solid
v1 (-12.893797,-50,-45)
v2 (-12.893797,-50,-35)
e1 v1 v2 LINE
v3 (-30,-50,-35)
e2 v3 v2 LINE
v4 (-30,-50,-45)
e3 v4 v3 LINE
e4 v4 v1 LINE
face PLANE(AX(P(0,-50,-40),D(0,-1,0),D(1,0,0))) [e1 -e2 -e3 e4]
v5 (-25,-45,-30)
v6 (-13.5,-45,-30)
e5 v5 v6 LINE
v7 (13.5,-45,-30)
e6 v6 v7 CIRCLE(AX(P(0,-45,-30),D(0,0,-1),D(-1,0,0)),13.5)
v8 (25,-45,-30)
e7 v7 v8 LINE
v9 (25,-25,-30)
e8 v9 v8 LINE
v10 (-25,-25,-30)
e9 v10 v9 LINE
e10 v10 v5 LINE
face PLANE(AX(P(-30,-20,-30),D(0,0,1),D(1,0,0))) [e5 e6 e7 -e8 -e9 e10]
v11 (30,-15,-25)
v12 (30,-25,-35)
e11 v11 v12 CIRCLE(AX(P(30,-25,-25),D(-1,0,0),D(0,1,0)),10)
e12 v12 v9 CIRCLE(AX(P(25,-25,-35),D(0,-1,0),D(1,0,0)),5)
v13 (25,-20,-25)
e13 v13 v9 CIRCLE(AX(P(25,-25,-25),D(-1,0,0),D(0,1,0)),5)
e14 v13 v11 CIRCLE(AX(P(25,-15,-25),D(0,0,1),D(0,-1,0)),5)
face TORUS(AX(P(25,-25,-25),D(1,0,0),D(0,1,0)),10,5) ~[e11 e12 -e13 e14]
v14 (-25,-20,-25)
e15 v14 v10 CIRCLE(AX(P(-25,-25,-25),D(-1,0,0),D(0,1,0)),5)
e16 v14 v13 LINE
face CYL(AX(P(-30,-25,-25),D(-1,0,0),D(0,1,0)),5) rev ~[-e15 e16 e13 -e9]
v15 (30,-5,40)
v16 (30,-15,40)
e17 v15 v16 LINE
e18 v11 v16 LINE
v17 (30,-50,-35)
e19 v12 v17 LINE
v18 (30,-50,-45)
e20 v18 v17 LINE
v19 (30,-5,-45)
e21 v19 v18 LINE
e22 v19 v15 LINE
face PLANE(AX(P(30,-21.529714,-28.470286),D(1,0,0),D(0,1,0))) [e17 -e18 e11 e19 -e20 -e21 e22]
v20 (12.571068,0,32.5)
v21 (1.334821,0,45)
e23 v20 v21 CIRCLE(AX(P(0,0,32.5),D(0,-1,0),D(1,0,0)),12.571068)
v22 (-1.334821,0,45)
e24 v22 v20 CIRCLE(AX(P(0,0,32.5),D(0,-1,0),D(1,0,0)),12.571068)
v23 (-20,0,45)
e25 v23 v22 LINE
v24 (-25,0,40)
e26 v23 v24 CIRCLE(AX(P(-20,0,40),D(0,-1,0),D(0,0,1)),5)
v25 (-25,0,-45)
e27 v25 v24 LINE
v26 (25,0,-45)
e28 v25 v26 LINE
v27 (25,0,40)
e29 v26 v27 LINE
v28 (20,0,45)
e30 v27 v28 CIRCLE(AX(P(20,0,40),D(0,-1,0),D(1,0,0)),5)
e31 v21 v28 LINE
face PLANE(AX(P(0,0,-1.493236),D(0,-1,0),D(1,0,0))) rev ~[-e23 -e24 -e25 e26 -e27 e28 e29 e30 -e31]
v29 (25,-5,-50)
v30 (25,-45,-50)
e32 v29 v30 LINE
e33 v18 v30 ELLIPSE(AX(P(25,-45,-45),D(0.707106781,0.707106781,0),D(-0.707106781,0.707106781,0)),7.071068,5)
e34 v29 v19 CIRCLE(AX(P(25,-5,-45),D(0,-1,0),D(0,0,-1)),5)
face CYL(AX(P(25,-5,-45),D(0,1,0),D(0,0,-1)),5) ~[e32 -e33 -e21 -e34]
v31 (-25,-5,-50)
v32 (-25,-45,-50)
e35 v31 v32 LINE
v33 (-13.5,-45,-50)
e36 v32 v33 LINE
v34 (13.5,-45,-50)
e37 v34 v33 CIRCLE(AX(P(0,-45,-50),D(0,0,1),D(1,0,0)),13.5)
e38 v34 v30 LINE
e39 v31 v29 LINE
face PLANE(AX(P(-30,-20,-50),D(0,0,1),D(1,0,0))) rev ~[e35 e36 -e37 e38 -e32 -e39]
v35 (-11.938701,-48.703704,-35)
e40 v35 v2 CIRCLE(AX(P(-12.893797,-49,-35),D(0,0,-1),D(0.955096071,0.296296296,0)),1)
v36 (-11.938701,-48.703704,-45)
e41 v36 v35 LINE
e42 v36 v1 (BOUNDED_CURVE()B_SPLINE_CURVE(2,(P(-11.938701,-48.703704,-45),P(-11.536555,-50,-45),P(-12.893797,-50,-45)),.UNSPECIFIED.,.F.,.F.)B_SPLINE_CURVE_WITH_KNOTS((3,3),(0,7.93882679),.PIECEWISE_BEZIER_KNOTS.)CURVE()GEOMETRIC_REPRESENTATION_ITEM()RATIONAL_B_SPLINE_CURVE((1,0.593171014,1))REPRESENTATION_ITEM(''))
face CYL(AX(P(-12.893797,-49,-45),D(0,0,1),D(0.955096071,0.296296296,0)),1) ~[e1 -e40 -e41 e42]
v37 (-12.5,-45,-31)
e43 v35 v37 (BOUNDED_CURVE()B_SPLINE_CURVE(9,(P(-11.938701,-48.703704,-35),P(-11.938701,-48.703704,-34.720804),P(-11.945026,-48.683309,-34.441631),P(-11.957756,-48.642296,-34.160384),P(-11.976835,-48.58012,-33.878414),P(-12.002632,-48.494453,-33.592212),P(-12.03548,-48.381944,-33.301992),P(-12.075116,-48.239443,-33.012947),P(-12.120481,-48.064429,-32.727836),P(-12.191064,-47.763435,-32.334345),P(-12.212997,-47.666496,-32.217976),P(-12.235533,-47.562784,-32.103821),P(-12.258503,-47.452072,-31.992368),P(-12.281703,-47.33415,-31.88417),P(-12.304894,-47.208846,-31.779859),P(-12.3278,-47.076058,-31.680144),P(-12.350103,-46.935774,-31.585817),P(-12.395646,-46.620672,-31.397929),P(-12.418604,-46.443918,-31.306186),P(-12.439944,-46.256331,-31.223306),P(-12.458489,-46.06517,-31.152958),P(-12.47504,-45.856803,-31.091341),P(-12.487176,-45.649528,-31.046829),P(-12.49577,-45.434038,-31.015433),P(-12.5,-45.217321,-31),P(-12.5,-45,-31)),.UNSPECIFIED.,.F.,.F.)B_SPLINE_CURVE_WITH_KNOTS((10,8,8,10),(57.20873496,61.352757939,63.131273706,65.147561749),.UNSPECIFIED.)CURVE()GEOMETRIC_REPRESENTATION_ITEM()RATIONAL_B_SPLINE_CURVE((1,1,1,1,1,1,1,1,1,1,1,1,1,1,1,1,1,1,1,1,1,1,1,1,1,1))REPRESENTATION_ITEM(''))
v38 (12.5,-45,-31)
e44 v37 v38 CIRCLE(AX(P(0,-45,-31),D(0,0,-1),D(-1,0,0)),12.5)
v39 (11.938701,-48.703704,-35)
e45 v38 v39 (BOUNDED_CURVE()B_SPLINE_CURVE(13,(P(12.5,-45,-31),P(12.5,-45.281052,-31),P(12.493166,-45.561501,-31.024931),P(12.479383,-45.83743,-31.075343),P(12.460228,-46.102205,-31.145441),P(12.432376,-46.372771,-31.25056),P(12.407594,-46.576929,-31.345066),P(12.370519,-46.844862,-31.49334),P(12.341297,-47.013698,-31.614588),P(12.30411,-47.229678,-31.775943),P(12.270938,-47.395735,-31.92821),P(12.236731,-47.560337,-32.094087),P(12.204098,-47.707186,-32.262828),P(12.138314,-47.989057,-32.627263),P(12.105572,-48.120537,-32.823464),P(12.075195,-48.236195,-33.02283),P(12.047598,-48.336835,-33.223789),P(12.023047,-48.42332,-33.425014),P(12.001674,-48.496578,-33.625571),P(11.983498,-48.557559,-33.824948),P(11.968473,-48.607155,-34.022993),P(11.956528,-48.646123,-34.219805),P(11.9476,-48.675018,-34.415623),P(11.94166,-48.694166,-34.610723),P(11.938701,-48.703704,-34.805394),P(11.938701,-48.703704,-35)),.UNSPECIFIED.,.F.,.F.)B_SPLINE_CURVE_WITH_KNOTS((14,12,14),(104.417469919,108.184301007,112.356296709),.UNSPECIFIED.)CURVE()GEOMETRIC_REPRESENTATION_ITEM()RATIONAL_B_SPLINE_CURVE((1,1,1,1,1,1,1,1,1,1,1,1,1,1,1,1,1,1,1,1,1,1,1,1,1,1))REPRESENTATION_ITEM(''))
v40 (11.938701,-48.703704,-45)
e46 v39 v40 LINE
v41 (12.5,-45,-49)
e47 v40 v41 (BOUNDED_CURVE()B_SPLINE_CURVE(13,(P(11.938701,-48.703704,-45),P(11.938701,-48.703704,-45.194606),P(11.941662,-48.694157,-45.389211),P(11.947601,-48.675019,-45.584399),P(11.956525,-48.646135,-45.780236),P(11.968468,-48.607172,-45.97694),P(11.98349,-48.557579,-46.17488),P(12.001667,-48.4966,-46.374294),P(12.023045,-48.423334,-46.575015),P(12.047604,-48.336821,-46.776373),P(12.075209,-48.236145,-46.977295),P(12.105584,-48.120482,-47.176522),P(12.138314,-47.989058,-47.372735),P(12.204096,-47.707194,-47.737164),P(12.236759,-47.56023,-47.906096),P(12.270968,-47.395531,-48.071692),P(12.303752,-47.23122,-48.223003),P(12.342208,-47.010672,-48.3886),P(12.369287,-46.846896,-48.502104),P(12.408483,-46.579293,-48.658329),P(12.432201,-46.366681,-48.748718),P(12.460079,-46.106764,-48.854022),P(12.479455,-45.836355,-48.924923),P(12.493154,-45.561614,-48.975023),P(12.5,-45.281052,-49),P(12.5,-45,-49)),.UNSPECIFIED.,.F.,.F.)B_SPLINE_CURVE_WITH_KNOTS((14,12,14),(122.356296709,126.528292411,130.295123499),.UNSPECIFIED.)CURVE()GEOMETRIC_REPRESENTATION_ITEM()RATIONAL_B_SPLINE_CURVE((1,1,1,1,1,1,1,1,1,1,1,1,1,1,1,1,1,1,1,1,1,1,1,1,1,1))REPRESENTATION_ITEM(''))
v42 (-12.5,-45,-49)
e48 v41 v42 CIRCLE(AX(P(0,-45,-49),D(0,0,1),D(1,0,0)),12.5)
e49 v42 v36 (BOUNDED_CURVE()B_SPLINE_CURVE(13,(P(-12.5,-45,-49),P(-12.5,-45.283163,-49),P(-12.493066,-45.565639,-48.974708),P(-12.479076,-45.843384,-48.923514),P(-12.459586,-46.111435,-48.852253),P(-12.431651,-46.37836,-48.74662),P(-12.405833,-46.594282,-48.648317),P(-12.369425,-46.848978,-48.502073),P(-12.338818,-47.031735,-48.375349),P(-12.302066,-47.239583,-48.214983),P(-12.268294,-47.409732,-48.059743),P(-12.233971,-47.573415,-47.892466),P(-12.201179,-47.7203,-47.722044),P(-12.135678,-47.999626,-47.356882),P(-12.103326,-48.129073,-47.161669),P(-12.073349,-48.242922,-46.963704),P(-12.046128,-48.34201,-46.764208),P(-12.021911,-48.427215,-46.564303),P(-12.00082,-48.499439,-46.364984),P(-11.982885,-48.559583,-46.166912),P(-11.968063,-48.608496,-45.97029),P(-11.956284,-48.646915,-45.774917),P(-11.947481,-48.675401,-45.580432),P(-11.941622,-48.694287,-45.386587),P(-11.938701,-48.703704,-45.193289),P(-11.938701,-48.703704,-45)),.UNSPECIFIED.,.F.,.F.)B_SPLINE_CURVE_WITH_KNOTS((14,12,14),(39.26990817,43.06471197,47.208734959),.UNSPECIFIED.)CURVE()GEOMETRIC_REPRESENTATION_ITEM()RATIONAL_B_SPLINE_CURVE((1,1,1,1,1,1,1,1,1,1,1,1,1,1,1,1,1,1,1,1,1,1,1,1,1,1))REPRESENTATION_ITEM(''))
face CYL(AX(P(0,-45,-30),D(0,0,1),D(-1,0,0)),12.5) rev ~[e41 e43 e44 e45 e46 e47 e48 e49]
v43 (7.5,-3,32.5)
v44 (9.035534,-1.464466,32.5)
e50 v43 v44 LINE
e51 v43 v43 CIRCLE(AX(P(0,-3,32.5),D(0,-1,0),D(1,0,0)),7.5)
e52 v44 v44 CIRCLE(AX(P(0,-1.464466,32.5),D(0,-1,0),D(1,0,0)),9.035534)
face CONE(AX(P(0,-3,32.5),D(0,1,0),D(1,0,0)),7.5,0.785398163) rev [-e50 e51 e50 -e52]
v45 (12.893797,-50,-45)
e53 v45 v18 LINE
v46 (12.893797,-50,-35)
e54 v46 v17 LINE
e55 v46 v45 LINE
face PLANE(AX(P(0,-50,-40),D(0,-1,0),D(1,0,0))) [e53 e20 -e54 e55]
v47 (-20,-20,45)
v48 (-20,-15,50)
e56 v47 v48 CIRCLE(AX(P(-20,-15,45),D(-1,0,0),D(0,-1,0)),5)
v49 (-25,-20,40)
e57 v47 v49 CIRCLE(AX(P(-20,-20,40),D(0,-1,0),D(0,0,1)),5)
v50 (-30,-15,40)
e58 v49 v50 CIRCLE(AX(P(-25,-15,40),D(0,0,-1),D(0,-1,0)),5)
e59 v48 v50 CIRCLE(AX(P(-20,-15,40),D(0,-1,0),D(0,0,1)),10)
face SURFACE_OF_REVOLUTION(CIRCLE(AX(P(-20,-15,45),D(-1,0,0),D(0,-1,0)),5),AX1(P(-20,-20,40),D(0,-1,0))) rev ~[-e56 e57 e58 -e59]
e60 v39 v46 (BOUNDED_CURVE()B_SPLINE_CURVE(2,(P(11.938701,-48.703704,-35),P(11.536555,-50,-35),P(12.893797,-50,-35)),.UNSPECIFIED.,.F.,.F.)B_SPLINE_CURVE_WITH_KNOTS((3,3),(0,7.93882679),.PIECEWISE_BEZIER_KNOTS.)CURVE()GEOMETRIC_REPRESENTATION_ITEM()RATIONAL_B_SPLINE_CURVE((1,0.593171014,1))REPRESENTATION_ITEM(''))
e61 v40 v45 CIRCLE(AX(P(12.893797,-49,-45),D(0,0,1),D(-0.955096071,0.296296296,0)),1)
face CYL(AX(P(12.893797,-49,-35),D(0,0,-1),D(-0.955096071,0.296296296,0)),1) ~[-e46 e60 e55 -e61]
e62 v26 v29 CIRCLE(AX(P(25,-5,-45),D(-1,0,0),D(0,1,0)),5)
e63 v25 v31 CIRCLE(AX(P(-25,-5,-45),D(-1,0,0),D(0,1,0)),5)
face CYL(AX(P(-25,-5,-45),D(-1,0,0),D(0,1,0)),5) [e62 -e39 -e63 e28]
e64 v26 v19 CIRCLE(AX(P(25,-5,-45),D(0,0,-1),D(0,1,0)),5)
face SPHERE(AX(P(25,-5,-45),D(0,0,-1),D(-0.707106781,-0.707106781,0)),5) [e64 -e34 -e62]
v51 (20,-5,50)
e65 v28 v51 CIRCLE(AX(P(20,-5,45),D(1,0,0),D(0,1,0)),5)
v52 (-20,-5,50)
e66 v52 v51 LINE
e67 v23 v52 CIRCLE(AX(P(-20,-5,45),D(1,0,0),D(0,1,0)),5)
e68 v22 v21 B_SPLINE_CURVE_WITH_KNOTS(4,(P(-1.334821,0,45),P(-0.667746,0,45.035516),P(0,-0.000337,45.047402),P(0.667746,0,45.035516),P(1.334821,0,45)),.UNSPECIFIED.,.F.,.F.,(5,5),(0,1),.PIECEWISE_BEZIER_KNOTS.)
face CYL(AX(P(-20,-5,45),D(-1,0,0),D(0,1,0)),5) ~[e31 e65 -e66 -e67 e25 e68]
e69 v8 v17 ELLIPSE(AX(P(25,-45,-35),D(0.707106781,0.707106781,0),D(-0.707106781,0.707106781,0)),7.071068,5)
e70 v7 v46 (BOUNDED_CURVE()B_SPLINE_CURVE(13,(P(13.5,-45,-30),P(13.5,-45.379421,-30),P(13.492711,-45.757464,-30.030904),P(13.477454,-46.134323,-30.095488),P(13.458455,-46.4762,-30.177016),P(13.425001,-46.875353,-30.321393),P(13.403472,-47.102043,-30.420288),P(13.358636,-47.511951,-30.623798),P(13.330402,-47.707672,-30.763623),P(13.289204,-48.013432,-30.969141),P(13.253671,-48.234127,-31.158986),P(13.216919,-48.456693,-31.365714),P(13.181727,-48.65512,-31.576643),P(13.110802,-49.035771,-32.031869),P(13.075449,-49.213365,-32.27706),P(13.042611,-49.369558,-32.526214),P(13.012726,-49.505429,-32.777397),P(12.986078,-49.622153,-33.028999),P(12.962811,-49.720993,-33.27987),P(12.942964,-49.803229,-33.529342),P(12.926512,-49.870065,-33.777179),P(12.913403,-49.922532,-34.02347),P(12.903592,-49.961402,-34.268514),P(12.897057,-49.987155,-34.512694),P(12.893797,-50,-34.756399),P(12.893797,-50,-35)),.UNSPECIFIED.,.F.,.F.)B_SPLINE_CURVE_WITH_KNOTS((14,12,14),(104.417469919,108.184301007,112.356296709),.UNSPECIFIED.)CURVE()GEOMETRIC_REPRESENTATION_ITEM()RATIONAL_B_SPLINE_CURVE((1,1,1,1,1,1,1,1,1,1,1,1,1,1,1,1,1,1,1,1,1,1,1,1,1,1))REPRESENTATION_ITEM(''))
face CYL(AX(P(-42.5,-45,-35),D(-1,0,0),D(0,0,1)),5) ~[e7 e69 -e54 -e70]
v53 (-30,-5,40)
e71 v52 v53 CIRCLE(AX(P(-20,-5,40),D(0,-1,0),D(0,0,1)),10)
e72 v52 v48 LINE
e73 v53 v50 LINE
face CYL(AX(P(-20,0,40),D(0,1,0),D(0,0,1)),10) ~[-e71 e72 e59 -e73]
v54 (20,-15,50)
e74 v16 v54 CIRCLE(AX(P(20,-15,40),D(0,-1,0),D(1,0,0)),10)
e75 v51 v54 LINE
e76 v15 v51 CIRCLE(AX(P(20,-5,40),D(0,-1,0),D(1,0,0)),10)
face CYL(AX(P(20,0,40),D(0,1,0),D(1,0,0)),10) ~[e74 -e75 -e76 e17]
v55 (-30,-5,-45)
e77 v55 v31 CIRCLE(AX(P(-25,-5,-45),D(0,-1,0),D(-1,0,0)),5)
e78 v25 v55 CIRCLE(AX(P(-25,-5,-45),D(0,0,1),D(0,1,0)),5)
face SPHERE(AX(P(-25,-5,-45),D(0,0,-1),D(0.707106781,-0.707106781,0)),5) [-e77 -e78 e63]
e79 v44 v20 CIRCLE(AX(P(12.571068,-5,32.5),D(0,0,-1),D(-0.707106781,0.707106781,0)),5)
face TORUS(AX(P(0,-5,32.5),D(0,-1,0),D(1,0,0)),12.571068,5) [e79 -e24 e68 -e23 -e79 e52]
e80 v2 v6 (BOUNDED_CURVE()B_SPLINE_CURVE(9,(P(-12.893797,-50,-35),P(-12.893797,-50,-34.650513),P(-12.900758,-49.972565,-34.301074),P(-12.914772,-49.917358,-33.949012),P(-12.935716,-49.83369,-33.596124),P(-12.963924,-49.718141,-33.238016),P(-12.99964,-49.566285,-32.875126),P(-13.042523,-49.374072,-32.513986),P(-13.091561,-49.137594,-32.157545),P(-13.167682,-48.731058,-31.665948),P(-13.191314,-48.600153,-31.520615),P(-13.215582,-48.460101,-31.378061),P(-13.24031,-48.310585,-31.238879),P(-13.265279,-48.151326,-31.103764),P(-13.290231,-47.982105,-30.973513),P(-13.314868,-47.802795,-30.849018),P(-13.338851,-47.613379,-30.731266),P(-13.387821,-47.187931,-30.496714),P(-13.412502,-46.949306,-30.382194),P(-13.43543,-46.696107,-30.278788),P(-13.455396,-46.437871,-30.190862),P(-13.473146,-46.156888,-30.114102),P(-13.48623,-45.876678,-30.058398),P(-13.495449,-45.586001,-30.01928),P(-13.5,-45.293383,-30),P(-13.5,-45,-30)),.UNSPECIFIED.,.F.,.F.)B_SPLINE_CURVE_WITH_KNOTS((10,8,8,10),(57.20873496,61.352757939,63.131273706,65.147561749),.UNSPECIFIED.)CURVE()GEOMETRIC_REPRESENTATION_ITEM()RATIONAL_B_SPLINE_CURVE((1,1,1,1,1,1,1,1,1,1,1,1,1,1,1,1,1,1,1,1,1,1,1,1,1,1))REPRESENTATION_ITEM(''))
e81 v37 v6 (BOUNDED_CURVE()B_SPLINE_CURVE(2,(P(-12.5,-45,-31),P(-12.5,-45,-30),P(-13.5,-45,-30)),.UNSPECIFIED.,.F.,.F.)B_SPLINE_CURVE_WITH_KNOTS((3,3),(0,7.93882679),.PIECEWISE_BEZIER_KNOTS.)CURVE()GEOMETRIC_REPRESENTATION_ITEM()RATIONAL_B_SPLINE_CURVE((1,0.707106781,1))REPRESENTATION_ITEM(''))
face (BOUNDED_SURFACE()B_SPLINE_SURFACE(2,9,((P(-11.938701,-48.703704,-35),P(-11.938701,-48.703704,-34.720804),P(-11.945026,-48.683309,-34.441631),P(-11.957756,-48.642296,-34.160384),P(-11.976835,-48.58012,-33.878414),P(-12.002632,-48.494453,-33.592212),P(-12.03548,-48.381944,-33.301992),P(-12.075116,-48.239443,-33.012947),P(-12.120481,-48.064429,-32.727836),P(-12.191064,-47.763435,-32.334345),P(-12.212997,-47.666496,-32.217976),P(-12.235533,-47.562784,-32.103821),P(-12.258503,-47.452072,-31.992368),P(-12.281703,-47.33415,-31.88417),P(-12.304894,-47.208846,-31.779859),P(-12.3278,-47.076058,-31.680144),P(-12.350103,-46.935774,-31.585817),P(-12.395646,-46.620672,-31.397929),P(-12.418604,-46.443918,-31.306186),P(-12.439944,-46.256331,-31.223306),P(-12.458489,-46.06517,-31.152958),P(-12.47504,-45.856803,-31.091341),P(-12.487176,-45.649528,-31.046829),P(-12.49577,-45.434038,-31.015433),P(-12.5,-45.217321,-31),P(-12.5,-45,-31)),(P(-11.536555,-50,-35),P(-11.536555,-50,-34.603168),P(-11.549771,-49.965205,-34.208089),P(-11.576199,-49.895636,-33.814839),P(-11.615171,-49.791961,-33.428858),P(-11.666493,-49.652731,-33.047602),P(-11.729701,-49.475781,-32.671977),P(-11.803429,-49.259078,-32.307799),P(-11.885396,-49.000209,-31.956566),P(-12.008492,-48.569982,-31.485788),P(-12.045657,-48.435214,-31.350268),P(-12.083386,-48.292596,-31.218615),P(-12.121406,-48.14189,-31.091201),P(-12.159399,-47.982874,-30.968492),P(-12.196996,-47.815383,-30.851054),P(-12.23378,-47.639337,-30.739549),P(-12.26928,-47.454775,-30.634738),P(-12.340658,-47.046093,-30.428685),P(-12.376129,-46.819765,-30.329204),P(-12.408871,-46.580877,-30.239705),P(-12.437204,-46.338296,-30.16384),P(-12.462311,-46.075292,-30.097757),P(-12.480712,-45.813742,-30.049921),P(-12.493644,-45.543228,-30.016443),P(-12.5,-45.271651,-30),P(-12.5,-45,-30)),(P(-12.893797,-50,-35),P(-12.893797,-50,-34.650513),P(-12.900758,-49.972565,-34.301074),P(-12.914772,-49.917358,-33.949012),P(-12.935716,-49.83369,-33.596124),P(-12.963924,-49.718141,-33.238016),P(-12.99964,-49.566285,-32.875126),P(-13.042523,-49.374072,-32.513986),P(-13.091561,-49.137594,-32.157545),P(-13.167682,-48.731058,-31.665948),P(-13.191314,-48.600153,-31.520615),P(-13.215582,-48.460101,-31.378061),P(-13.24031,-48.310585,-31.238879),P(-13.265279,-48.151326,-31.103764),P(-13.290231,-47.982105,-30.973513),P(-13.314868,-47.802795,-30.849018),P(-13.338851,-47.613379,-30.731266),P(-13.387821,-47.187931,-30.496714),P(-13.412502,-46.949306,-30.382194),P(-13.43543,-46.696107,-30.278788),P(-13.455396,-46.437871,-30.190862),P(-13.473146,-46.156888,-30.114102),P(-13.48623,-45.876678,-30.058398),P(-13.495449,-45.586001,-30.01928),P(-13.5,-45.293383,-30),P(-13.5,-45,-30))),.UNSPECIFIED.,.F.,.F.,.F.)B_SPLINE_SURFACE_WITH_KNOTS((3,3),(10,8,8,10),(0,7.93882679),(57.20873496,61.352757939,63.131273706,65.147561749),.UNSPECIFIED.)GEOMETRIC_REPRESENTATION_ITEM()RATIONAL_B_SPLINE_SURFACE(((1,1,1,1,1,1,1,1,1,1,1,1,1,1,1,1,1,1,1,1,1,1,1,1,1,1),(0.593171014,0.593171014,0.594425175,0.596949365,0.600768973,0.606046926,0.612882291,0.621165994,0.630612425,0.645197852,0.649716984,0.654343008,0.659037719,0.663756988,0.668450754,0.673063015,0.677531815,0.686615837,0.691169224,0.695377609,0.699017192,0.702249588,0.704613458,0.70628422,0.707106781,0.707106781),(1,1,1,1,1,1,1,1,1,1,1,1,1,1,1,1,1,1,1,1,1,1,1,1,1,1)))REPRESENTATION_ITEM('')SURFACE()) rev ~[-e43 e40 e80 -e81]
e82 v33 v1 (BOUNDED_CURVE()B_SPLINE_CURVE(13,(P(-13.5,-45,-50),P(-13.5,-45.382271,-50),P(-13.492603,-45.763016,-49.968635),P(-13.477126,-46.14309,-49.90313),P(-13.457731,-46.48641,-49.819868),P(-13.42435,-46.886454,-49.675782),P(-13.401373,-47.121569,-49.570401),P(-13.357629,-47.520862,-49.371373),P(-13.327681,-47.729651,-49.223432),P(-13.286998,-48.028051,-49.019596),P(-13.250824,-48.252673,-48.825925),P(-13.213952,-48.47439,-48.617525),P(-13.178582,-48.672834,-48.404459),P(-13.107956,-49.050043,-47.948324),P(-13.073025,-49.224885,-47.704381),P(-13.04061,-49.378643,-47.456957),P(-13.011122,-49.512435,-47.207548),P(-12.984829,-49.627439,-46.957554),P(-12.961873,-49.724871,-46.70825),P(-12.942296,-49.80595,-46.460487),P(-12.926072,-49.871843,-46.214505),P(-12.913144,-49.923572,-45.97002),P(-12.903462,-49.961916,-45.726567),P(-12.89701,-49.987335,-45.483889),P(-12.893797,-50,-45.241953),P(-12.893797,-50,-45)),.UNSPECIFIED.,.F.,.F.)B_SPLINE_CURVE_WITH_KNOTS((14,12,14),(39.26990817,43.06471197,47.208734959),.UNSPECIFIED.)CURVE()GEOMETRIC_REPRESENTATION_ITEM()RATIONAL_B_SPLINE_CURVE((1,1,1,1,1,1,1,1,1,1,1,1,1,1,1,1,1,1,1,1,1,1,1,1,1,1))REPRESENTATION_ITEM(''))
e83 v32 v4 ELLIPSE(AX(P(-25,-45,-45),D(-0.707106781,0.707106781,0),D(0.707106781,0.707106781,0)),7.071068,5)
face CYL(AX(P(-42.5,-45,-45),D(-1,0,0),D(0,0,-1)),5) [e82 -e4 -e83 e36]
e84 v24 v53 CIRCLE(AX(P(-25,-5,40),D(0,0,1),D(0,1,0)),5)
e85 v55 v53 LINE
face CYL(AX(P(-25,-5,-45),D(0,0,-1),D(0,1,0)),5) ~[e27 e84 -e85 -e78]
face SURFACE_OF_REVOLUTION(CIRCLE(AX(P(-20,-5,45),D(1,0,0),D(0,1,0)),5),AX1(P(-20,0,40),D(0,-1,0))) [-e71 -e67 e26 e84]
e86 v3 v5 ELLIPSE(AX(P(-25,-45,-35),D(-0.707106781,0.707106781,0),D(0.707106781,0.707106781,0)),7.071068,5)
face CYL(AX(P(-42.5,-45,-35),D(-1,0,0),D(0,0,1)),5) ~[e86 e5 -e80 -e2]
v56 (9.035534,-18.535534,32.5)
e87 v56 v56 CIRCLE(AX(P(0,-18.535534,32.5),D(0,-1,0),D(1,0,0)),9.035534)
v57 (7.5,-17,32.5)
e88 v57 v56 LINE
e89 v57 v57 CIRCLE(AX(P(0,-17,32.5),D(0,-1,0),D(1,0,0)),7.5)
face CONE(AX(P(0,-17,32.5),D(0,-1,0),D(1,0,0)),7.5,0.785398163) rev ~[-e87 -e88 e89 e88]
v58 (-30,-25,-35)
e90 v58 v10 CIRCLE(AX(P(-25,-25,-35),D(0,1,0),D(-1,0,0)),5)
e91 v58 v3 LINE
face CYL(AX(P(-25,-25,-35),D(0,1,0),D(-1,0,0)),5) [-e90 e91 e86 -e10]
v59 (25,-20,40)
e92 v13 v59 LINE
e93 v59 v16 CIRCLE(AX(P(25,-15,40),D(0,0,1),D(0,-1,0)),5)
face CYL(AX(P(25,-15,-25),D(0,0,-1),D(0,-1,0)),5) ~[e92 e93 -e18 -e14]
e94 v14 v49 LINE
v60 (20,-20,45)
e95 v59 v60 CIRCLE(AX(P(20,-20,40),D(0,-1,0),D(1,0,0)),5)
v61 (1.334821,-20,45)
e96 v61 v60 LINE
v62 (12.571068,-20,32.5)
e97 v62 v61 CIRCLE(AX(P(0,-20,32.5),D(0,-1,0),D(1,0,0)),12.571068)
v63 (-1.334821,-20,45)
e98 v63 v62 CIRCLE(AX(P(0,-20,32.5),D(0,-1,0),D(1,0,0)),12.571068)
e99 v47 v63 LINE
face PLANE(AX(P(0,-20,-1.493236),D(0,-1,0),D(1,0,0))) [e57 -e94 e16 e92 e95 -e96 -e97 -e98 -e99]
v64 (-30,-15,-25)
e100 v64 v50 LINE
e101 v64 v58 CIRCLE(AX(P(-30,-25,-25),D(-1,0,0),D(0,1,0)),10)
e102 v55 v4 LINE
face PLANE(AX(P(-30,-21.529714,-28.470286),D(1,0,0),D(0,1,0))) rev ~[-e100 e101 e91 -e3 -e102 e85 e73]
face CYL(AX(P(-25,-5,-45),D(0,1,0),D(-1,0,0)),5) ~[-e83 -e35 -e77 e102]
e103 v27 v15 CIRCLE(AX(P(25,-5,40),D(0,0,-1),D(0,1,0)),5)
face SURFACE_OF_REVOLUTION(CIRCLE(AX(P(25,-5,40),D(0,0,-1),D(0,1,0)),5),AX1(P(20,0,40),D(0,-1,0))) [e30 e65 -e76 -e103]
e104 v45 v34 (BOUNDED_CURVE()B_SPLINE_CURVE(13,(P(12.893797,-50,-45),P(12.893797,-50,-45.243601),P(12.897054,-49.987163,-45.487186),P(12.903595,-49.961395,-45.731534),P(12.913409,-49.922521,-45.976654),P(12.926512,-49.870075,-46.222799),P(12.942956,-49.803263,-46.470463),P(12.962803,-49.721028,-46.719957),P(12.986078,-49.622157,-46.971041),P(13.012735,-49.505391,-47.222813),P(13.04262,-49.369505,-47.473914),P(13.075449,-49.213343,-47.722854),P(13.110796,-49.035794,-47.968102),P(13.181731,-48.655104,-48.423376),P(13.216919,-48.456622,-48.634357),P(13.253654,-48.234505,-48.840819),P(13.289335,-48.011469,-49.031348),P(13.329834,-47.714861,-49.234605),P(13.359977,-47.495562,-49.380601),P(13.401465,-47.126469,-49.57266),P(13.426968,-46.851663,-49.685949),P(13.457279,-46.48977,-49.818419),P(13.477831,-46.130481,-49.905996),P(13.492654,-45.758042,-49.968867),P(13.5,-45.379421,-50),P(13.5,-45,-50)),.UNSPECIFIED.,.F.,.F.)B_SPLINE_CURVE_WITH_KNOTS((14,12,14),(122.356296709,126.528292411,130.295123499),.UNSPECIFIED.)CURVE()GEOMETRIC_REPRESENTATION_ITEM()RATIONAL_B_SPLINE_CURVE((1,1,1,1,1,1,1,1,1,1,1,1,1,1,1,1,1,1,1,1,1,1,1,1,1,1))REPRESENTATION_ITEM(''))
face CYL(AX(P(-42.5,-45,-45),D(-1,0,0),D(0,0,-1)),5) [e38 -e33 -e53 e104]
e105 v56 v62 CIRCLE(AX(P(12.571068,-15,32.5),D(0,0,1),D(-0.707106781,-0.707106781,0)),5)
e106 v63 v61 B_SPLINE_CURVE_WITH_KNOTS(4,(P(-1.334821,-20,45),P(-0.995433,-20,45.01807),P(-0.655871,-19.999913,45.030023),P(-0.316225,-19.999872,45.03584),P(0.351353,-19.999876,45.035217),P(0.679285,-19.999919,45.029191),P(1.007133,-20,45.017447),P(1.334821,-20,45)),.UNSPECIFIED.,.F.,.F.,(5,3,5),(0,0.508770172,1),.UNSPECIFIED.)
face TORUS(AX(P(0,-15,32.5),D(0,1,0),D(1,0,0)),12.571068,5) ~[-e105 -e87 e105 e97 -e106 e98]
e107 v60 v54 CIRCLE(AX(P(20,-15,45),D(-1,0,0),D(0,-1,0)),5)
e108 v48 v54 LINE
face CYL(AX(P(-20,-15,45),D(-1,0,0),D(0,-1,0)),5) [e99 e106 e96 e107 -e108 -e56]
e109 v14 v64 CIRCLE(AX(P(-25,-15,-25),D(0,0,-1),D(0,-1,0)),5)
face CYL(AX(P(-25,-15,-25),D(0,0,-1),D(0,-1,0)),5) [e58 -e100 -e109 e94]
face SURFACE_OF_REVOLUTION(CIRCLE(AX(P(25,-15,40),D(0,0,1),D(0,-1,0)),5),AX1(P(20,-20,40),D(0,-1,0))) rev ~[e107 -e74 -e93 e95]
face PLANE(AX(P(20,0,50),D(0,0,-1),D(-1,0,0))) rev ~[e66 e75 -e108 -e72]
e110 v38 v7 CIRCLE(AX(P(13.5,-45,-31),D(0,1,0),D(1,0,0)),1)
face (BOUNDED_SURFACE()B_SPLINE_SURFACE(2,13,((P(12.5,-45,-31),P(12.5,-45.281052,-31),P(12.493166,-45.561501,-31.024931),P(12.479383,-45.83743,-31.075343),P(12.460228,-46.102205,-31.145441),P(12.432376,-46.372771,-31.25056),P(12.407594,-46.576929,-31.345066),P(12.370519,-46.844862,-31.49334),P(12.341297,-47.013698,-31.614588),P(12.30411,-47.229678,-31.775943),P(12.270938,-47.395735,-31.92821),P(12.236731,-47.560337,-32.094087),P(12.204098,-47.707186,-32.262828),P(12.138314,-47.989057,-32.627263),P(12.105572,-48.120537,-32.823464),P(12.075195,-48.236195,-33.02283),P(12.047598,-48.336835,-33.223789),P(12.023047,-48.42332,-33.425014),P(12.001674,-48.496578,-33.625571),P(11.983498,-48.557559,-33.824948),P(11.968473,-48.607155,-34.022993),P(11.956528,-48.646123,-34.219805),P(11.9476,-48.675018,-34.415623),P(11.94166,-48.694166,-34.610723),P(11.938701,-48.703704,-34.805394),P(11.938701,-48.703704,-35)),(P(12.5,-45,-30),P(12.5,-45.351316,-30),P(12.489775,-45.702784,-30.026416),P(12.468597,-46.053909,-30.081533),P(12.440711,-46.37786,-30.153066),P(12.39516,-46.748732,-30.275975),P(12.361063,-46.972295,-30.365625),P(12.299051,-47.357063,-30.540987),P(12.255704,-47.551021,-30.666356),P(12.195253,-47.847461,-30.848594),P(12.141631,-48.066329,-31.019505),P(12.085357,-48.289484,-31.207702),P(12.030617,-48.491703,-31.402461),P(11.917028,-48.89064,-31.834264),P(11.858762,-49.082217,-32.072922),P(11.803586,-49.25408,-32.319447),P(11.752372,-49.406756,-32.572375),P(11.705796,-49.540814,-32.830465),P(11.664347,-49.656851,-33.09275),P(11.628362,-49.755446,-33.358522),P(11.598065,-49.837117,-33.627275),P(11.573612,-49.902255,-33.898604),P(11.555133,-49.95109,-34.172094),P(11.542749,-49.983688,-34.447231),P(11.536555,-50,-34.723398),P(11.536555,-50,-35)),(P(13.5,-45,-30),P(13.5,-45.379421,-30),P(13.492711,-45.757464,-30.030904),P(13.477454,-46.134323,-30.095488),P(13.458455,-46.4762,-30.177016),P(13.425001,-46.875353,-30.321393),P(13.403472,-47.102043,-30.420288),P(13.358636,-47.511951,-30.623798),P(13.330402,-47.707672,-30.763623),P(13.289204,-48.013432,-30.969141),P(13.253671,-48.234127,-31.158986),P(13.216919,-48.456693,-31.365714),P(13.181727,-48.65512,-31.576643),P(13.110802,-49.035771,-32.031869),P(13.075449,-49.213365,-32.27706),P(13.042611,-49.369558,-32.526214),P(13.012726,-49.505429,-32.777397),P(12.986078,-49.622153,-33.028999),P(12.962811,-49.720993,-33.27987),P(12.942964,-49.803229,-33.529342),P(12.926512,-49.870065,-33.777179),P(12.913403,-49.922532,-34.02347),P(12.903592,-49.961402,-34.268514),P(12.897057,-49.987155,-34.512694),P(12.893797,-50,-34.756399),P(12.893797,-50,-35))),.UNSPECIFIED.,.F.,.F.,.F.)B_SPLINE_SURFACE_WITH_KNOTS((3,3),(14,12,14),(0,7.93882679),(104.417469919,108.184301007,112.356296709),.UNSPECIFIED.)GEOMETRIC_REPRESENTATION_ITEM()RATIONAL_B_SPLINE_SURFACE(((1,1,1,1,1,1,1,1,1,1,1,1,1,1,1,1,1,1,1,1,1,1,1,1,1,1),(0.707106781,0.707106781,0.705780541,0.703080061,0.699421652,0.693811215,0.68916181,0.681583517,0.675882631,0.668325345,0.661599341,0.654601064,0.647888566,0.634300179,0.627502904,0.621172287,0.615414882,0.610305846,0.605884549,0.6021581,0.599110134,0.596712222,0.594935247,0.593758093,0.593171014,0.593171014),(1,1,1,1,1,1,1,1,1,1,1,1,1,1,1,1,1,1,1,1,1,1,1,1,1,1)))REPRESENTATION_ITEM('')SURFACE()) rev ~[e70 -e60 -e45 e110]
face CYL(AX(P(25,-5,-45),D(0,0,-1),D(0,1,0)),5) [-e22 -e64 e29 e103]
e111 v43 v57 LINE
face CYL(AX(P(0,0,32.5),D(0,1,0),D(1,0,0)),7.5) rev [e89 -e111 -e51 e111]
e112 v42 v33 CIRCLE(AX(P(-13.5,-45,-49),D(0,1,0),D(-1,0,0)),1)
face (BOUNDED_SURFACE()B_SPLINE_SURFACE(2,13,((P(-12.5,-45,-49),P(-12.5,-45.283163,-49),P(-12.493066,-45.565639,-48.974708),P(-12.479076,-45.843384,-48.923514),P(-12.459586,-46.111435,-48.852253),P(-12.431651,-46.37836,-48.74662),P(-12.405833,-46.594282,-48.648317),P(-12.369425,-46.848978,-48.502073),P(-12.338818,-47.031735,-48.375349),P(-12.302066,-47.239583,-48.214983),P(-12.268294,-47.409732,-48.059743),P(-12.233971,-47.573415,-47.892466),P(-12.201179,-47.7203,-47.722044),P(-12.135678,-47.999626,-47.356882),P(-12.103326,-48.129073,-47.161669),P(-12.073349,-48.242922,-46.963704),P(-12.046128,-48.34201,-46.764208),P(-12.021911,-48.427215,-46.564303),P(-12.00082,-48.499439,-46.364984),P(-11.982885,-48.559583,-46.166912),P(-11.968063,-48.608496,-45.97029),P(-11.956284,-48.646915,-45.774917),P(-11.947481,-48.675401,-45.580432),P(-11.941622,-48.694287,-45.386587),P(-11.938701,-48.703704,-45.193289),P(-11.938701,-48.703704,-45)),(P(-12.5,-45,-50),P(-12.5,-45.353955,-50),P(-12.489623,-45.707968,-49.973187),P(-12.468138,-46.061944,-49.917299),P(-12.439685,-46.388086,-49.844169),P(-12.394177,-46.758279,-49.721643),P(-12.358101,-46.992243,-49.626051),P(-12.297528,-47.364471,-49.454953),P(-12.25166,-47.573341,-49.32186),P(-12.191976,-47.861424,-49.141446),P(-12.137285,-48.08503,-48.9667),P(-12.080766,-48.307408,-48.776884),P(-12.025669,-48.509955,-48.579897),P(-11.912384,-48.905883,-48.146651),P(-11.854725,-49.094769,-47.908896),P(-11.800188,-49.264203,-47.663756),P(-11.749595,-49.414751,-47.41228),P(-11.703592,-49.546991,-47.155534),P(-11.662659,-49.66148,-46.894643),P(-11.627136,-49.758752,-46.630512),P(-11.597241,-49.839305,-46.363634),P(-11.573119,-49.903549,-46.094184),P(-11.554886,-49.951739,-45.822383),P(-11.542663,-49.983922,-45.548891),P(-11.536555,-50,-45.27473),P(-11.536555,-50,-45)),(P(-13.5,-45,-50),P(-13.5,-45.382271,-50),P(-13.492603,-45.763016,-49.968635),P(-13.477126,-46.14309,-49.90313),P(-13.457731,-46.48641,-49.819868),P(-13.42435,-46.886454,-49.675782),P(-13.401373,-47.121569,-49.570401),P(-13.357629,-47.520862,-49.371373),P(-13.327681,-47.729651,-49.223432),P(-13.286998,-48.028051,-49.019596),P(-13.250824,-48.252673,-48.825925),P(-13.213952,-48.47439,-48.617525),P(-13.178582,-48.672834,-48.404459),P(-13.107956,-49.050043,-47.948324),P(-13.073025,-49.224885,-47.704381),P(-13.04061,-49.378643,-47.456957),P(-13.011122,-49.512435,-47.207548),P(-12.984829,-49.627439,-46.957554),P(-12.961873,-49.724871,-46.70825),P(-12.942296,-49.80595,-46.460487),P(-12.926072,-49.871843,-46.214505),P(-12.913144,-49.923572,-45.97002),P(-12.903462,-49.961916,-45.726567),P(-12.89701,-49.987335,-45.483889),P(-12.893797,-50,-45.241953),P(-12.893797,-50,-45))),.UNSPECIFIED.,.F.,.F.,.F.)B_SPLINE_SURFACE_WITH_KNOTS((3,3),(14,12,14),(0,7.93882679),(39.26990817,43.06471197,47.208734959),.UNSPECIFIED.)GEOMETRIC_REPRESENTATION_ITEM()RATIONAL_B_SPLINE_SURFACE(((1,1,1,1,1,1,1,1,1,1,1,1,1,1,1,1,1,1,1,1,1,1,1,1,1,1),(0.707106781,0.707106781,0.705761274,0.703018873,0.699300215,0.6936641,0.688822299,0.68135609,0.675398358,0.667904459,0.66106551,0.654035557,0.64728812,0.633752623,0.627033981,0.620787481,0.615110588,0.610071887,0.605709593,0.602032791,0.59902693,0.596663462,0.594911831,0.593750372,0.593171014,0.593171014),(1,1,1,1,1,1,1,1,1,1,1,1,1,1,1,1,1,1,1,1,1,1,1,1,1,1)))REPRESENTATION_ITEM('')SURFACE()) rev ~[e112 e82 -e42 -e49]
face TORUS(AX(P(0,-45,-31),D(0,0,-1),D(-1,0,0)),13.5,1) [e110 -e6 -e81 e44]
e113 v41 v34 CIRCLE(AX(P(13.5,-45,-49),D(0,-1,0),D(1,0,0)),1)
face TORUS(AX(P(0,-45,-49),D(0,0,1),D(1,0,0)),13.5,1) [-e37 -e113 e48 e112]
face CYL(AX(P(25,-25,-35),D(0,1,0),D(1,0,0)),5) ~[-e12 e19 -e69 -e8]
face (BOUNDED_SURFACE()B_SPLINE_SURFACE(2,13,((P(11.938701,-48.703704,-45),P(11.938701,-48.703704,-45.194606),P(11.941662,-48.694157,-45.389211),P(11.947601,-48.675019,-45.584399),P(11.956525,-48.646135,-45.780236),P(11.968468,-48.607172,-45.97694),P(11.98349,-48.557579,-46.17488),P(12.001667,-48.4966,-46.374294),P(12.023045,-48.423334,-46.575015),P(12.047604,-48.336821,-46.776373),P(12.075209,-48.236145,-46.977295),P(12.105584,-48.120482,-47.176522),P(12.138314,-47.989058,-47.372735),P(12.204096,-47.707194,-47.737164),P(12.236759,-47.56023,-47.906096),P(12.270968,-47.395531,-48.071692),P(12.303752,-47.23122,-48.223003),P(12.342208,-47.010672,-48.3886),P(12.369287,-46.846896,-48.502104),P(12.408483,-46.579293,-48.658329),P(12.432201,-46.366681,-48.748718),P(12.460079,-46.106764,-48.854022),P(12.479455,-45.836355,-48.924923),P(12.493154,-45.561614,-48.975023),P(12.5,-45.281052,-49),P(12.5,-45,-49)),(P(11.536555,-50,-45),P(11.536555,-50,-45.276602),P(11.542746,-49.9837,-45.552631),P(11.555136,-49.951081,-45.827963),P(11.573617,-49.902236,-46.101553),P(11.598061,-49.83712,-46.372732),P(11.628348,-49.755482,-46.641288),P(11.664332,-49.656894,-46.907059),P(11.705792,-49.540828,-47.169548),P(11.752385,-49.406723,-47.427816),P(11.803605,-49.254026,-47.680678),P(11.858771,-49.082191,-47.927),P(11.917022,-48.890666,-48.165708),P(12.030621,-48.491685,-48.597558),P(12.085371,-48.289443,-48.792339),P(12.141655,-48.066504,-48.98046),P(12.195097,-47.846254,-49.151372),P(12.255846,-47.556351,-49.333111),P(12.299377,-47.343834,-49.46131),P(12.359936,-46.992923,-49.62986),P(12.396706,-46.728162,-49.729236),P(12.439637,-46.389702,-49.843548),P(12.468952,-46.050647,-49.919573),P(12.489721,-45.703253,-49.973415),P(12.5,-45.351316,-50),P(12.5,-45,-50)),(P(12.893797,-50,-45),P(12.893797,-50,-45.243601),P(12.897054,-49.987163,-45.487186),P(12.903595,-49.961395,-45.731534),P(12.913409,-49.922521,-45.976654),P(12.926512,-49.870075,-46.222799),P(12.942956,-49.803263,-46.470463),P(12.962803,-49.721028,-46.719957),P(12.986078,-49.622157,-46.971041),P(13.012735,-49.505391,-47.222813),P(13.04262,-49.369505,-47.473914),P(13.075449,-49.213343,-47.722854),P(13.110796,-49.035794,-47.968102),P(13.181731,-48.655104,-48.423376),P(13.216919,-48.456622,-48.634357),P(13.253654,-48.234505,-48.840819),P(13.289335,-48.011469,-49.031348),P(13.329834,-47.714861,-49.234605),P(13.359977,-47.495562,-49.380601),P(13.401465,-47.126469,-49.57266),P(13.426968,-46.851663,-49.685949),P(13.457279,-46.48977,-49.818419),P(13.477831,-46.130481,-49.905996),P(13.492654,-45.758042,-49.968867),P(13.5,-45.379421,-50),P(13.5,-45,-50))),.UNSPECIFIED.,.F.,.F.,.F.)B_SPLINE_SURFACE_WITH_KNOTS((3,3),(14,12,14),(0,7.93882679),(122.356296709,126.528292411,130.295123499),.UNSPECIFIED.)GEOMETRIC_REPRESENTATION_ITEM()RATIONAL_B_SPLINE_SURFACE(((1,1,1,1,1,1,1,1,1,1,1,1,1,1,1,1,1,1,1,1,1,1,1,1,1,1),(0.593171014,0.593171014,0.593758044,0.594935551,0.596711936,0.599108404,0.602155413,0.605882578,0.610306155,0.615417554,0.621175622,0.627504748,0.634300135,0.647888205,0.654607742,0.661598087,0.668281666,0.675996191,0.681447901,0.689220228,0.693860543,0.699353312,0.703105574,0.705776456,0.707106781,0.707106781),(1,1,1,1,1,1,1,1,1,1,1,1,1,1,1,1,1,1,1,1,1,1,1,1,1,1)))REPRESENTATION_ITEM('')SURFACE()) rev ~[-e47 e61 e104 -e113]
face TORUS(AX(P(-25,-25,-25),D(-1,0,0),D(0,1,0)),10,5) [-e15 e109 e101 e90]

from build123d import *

# Parameters (mm, degrees)
F0_R         = 7.5
F1_DEPTH     = 20
F2_SIZE      = 3
F3_W         = 60
F3_H         = 20
F4_DEPTH     = 30
F5_T1_DEPTH  = 60
F5_T3_DEPTH  = 65
F5_T5_DEPTH  = 40
F5_T7_DEPTH  = 37.5
F5_T9_DEPTH  = 85
F5_T12_ANGLE = 90
F5_T14_ANGLE = 90
F5_T18_ANGLE = 90
F5_T20_ANGLE = 90
F6_T1_DEPTH  = 40
F6_T3_DEPTH  = 85
F6_T5_DEPTH  = 50
F6_T7_DEPTH  = 57.5
F6_T9_DEPTH  = 85
F6_S13_W     = 5
F6_S13_H     = 5
F6_T14_DEPTH = 5
F6_S19_W     = 5
F6_S19_H     = 5
F6_T20_DEPTH = 5
F6_T26_ANGLE = 90
F6_T28_ANGLE = 90
F8_DEPTH     = 20.001
F9_R         = 1


# Not quite as in the source:
# - a fillet or chamfer that OpenCascade refuses, or shapes differently, is made with other operations: its cross-section is extruded or revolved along the edge and cut away or added


with BuildPart() as f1:
    # F0 (on Front) → F1 (new body)
    with BuildSketch(Plane.XZ):
        with BuildLine():
            Line((20, 50), (-20, 50))
            ThreePointArc((-20, 50), (-27.0710678119, 47.0710678119), (-30, 40))
            Line((-30, 40), (-30, -50))
            Line((-30, -50), (30, -50))
            Line((30, -50), (30, 40))
            ThreePointArc((30, 40), (27.0710678119, 47.0710678119), (20, 50))
        make_face()
        with Locations((0, 32.5)):
            Circle(F0_R, mode=Mode.SUBTRACT)
    extrude(amount=F1_DEPTH)

    # F2
    f2_edges = [f1.edges().sort_by_distance(p)[0] for p in [
        (7.5, -10, 32.5),
        (-7.5, 0, 32.5),
        (-7.5, -20, 32.5),
    ]]
    chamfer(f2_edges, length=F2_SIZE)

    # F3 (on face) → F4 (join)
    with BuildSketch(Plane.XZ.offset(20)):
        with Locations((0, -40)):
            Rectangle(F3_W, F3_H)
    extrude(amount=F4_DEPTH)

    # F5: fillet of radius 5 on 10 edges, made by hand

    # F5_s2 → F5_t1 (join)
    with BuildSketch(Plane.YZ.offset(-30)):
        with BuildLine():
            ThreePointArc((-20, -25), (-21.4644660941, -28.5355339059), (-25, -30))
            Line((-25, -30), (-20, -30))
            Line((-20, -30), (-20, -25))
        make_face()
    extrude(amount=F5_T1_DEPTH)

    # F5_s4 → F5_t3 (cut)
    with BuildSketch(Plane.XY.offset(-25)):
        with BuildLine():
            ThreePointArc((25, -20), (28.5355339059, -18.5355339059), (30, -15))
            Line((30, -15), (30, -20))
            Line((30, -20), (25, -20))
        make_face()
        with BuildLine():
            ThreePointArc((-25, -20), (-28.5355339059, -18.5355339059), (-30, -15))
            Line((-30, -15), (-30, -20))
            Line((-30, -20), (-25, -20))
        make_face()
    extrude(amount=F5_T3_DEPTH, mode=Mode.SUBTRACT)

    # F5_s6 → F5_t5 (cut)
    with BuildSketch(Plane.YZ.offset(-20)):
        with BuildLine():
            ThreePointArc((-20, 45), (-18.5355339059, 48.5355339059), (-15, 50))
            Line((-15, 50), (-20, 50))
            Line((-20, 50), (-20, 45))
        make_face()
    extrude(amount=F5_T5_DEPTH, mode=Mode.SUBTRACT)

    # F5_s8 → F5_t7 (cut)
    with BuildSketch(Plane.XZ.offset(25)):
        with BuildLine():
            ThreePointArc((30, -35), (28.5355339059, -31.4644660941), (25, -30))
            Line((25, -30), (30, -30))
            Line((30, -30), (30, -35))
        make_face()
        with BuildLine():
            ThreePointArc((-30, -35), (-28.5355339059, -31.4644660941), (-25, -30))
            Line((-25, -30), (-30, -30))
            Line((-30, -30), (-30, -35))
        make_face()
    extrude(amount=F5_T7_DEPTH, mode=Mode.SUBTRACT)

    # F5_s10 → F5_t9 (cut)
    with BuildSketch(Plane.YZ.offset(-42.5)):
        with BuildLine():
            ThreePointArc((-45, -30), (-48.5355339059, -31.4644660941), (-50, -35))
            Line((-50, -35), (-50, -30))
            Line((-50, -30), (-45, -30))
        make_face()
    extrude(amount=F5_T9_DEPTH, mode=Mode.SUBTRACT)

    # F5_s11 → F5_t12 (revolve, cut)
    with BuildSketch(Plane.XY.offset(40)):
        with BuildLine():
            ThreePointArc((25, -20), (28.5355339059, -18.5355339059), (30, -15))
            Line((30, -15), (30, -20))
            Line((30, -20), (25, -20))
        make_face()
    revolve(axis=Axis((20, -20, 40), (0, -1, 0)), revolution_arc=F5_T12_ANGLE, mode=Mode.SUBTRACT)

    # F5_s13 → F5_t14 (revolve, cut)
    with BuildSketch(Plane.YZ.offset(-20)):
        with BuildLine():
            ThreePointArc((-20, 45), (-18.5355339059, 48.5355339059), (-15, 50))
            Line((-15, 50), (-20, 50))
            Line((-20, 50), (-20, 45))
        make_face()
    revolve(axis=Axis((-20, -20, 40), (0, -1, 0)), revolution_arc=F5_T14_ANGLE, mode=Mode.SUBTRACT)

    # F5_s15 → F5_t16 (revolve, cut)
    with BuildSketch(Plane.XY.offset(32.5)):
        with BuildLine():
            ThreePointArc((9.0355339059, -18.5355339059), (10.65765065, -19.6193976626), (12.5710678119, -20))
            Line((12.5710678119, -20), (10.5, -20))
            Line((10.5, -20), (9.0355339059, -18.5355339059))
        make_face()
    revolve(axis=Axis((0, -20, 32.5), (0, -1, 0)), mode=Mode.SUBTRACT)

    # F5_s17 → F5_t18 (revolve, cut)
    with BuildSketch(Plane.XY.offset(-25)):
        with BuildLine():
            ThreePointArc((-30, -15), (-28.5355339059, -18.5355339059), (-25, -20))
            Line((-25, -20), (-30, -20))
            Line((-30, -20), (-30, -15))
        make_face()
    revolve(axis=Axis((-30, -25, -25), (-1, 0, 0)), revolution_arc=F5_T18_ANGLE, mode=Mode.SUBTRACT)

    # F5_s19 → F5_t20 (revolve, cut)
    with BuildSketch(Plane.XY.offset(-25)):
        with BuildLine():
            ThreePointArc((30, -15), (28.5355339059, -18.5355339059), (25, -20))
            Line((25, -20), (30, -20))
            Line((30, -20), (30, -15))
        make_face()
    revolve(axis=Axis((30, -25, -25), (-1, 0, 0)), revolution_arc=F5_T20_ANGLE, mode=Mode.SUBTRACT)

    # F6: fillet of radius 5 on 10 edges, made by hand

    # F6_s2 → F6_t1 (cut)
    with BuildSketch(Plane.YZ.offset(-20)):
        with BuildLine():
            ThreePointArc((0, 45), (-1.4644660941, 48.5355339059), (-5, 50))
            Line((-5, 50), (0, 50))
            Line((0, 50), (0, 45))
        make_face()
    extrude(amount=F6_T1_DEPTH, mode=Mode.SUBTRACT)

    # F6_s4 → F6_t3 (cut)
    with BuildSketch(Plane.XY.offset(-45)):
        with BuildLine():
            ThreePointArc((-25, 0), (-28.5355339059, -1.4644660941), (-30, -5))
            Line((-30, -5), (-30, 0))
            Line((-30, 0), (-25, 0))
        make_face()
        with BuildLine():
            ThreePointArc((25, 0), (28.5355339059, -1.4644660941), (30, -5))
            Line((30, -5), (30, 0))
            Line((30, 0), (25, 0))
        make_face()
    extrude(amount=F6_T3_DEPTH, mode=Mode.SUBTRACT)

    # F6_s6 → F6_t5 (cut)
    with BuildSketch(Plane.YZ.offset(-25)):
        with BuildLine():
            ThreePointArc((0, -45), (-1.4644660941, -48.5355339059), (-5, -50))
            Line((-5, -50), (0, -50))
            Line((0, -50), (0, -45))
        make_face()
    extrude(amount=F6_T5_DEPTH, mode=Mode.SUBTRACT)

    # F6_s8 → F6_t7 (cut)
    with BuildSketch(Plane.XZ.offset(5)):
        with BuildLine():
            ThreePointArc((-30, -45), (-28.5355339059, -48.5355339059), (-25, -50))
            Line((-25, -50), (-30, -50))
            Line((-30, -50), (-30, -45))
        make_face()
        with BuildLine():
            ThreePointArc((25, -50), (28.5355339059, -48.5355339059), (30, -45))
            Line((30, -45), (30, -50))
            Line((30, -50), (25, -50))
        make_face()
    extrude(amount=F6_T7_DEPTH, mode=Mode.SUBTRACT)

    # F6_s10 → F6_t9 (cut)
    with BuildSketch(Plane.YZ.offset(-42.5)):
        with BuildLine():
            ThreePointArc((-45, -50), (-48.5355339059, -48.5355339059), (-50, -45))
            Line((-50, -45), (-50, -50))
            Line((-50, -50), (-45, -50))
        make_face()
    extrude(amount=F6_T9_DEPTH, mode=Mode.SUBTRACT)


with BuildPart() as f6_tool12:
    # F6_s13 → F6_t14 (new body)
    with BuildSketch(Plane.XY.offset(-45)):
        with Locations((-27.5, -2.5)):
            Rectangle(F6_S13_W, F6_S13_H)
    extrude(amount=-F6_T14_DEPTH)

    # F6_s15 → F6_t16 (revolve, cut)
    with BuildSketch(Plane(origin=(-25, -5, -45), x_dir=(0.7071067812, -0.7071067812, 0), z_dir=(0.7071067812, 0.7071067812, 0))):
        with BuildLine():
            ThreePointArc((0, -5), (5, 0), (0, 5))
            Line((0, 5), (0, -5))
        make_face()
    revolve(axis=Axis((-25, -5, -45), (0, 0, -1)), mode=Mode.SUBTRACT)


with BuildPart() as f1_1:
    add(f1.part)

    # F6_t11: cut F6_tool12
    add(f6_tool12.part, mode=Mode.SUBTRACT)


with BuildPart() as f6_tool18:
    # F6_s19 → F6_t20 (new body)
    with BuildSketch(Plane.XY.offset(-45)):
        with Locations((27.5, -2.5)):
            Rectangle(F6_S19_W, F6_S19_H)
    extrude(amount=-F6_T20_DEPTH)

    # F6_s21 → F6_t22 (revolve, cut)
    with BuildSketch(Plane(origin=(25, -5, -45), x_dir=(-0.7071067812, -0.7071067812, 0), z_dir=(0.7071067812, -0.7071067812, 0))):
        with BuildLine():
            ThreePointArc((0, -5), (5, 0), (0, 5))
            Line((0, 5), (0, -5))
        make_face()
    revolve(axis=Axis((25, -5, -45), (0, 0, -1)), mode=Mode.SUBTRACT)


with BuildPart() as f1_2:
    add(f1_1.part)

    # F6_t17: cut F6_tool18
    add(f6_tool18.part, mode=Mode.SUBTRACT)

    # F6_s23 → F6_t24 (revolve, cut)
    with BuildSketch(Plane.XY.offset(32.5)):
        with BuildLine():
            ThreePointArc((9.0355339059, -1.4644660941), (10.65765065, -0.3806023374), (12.5710678119, 0))
            Line((12.5710678119, 0), (10.5, 0))
            Line((10.5, 0), (9.0355339059, -1.4644660941))
        make_face()
    revolve(axis=Axis((0, 0, 32.5), (0, -1, 0)), mode=Mode.SUBTRACT)

    # F6_s25 → F6_t26 (revolve, cut)
    with BuildSketch(Plane.YZ.offset(-20)):
        with BuildLine():
            ThreePointArc((0, 45), (-1.4644660941, 48.5355339059), (-5, 50))
            Line((-5, 50), (0, 50))
            Line((0, 50), (0, 45))
        make_face()
    revolve(axis=Axis((-20, 0, 40), (0, -1, 0)), revolution_arc=F6_T26_ANGLE, mode=Mode.SUBTRACT)

    # F6_s27 → F6_t28 (revolve, cut)
    with BuildSketch(Plane.XY.offset(40)):
        with BuildLine():
            ThreePointArc((25, 0), (28.5355339059, -1.4644660941), (30, -5))
            Line((30, -5), (30, 0))
            Line((30, 0), (25, 0))
        make_face()
    revolve(axis=Axis((20, 0, 40), (0, -1, 0)), revolution_arc=F6_T28_ANGLE, mode=Mode.SUBTRACT)

    # F7 (on face) → F8 (cut, through all)
    with BuildSketch(Plane.XY.offset(-30)):
        with BuildLine():
            Line((-12.5, -45), (12.5, -45))
            ThreePointArc((12.5, -45), (0, -32.5), (-12.5, -45))
        make_face()
        with BuildLine():
            ThreePointArc((-12.5, -45), (0, -57.5), (12.5, -45))
            Line((12.5, -45), (-12.5, -45))
        make_face()
    extrude(amount=-F8_DEPTH, mode=Mode.SUBTRACT)

    # F9
    f9_edges = [f1_2.edges().sort_by_distance(p)[0] for p in [
        (0, -32.5, -50),
        (-11.98926, -48.536614, -48.534454),
        (-11.456439, -50, -40),
        (-11.98926, -48.536614, -31.465546),
        (0, -32.5, -30),
        (11.98926, -48.536614, -31.465546),
        (11.456439, -50, -40),
        (11.98926, -48.536614, -48.534454),
    ]]
    fillet(f9_edges, radius=F9_R)


solid = f1_2.part
